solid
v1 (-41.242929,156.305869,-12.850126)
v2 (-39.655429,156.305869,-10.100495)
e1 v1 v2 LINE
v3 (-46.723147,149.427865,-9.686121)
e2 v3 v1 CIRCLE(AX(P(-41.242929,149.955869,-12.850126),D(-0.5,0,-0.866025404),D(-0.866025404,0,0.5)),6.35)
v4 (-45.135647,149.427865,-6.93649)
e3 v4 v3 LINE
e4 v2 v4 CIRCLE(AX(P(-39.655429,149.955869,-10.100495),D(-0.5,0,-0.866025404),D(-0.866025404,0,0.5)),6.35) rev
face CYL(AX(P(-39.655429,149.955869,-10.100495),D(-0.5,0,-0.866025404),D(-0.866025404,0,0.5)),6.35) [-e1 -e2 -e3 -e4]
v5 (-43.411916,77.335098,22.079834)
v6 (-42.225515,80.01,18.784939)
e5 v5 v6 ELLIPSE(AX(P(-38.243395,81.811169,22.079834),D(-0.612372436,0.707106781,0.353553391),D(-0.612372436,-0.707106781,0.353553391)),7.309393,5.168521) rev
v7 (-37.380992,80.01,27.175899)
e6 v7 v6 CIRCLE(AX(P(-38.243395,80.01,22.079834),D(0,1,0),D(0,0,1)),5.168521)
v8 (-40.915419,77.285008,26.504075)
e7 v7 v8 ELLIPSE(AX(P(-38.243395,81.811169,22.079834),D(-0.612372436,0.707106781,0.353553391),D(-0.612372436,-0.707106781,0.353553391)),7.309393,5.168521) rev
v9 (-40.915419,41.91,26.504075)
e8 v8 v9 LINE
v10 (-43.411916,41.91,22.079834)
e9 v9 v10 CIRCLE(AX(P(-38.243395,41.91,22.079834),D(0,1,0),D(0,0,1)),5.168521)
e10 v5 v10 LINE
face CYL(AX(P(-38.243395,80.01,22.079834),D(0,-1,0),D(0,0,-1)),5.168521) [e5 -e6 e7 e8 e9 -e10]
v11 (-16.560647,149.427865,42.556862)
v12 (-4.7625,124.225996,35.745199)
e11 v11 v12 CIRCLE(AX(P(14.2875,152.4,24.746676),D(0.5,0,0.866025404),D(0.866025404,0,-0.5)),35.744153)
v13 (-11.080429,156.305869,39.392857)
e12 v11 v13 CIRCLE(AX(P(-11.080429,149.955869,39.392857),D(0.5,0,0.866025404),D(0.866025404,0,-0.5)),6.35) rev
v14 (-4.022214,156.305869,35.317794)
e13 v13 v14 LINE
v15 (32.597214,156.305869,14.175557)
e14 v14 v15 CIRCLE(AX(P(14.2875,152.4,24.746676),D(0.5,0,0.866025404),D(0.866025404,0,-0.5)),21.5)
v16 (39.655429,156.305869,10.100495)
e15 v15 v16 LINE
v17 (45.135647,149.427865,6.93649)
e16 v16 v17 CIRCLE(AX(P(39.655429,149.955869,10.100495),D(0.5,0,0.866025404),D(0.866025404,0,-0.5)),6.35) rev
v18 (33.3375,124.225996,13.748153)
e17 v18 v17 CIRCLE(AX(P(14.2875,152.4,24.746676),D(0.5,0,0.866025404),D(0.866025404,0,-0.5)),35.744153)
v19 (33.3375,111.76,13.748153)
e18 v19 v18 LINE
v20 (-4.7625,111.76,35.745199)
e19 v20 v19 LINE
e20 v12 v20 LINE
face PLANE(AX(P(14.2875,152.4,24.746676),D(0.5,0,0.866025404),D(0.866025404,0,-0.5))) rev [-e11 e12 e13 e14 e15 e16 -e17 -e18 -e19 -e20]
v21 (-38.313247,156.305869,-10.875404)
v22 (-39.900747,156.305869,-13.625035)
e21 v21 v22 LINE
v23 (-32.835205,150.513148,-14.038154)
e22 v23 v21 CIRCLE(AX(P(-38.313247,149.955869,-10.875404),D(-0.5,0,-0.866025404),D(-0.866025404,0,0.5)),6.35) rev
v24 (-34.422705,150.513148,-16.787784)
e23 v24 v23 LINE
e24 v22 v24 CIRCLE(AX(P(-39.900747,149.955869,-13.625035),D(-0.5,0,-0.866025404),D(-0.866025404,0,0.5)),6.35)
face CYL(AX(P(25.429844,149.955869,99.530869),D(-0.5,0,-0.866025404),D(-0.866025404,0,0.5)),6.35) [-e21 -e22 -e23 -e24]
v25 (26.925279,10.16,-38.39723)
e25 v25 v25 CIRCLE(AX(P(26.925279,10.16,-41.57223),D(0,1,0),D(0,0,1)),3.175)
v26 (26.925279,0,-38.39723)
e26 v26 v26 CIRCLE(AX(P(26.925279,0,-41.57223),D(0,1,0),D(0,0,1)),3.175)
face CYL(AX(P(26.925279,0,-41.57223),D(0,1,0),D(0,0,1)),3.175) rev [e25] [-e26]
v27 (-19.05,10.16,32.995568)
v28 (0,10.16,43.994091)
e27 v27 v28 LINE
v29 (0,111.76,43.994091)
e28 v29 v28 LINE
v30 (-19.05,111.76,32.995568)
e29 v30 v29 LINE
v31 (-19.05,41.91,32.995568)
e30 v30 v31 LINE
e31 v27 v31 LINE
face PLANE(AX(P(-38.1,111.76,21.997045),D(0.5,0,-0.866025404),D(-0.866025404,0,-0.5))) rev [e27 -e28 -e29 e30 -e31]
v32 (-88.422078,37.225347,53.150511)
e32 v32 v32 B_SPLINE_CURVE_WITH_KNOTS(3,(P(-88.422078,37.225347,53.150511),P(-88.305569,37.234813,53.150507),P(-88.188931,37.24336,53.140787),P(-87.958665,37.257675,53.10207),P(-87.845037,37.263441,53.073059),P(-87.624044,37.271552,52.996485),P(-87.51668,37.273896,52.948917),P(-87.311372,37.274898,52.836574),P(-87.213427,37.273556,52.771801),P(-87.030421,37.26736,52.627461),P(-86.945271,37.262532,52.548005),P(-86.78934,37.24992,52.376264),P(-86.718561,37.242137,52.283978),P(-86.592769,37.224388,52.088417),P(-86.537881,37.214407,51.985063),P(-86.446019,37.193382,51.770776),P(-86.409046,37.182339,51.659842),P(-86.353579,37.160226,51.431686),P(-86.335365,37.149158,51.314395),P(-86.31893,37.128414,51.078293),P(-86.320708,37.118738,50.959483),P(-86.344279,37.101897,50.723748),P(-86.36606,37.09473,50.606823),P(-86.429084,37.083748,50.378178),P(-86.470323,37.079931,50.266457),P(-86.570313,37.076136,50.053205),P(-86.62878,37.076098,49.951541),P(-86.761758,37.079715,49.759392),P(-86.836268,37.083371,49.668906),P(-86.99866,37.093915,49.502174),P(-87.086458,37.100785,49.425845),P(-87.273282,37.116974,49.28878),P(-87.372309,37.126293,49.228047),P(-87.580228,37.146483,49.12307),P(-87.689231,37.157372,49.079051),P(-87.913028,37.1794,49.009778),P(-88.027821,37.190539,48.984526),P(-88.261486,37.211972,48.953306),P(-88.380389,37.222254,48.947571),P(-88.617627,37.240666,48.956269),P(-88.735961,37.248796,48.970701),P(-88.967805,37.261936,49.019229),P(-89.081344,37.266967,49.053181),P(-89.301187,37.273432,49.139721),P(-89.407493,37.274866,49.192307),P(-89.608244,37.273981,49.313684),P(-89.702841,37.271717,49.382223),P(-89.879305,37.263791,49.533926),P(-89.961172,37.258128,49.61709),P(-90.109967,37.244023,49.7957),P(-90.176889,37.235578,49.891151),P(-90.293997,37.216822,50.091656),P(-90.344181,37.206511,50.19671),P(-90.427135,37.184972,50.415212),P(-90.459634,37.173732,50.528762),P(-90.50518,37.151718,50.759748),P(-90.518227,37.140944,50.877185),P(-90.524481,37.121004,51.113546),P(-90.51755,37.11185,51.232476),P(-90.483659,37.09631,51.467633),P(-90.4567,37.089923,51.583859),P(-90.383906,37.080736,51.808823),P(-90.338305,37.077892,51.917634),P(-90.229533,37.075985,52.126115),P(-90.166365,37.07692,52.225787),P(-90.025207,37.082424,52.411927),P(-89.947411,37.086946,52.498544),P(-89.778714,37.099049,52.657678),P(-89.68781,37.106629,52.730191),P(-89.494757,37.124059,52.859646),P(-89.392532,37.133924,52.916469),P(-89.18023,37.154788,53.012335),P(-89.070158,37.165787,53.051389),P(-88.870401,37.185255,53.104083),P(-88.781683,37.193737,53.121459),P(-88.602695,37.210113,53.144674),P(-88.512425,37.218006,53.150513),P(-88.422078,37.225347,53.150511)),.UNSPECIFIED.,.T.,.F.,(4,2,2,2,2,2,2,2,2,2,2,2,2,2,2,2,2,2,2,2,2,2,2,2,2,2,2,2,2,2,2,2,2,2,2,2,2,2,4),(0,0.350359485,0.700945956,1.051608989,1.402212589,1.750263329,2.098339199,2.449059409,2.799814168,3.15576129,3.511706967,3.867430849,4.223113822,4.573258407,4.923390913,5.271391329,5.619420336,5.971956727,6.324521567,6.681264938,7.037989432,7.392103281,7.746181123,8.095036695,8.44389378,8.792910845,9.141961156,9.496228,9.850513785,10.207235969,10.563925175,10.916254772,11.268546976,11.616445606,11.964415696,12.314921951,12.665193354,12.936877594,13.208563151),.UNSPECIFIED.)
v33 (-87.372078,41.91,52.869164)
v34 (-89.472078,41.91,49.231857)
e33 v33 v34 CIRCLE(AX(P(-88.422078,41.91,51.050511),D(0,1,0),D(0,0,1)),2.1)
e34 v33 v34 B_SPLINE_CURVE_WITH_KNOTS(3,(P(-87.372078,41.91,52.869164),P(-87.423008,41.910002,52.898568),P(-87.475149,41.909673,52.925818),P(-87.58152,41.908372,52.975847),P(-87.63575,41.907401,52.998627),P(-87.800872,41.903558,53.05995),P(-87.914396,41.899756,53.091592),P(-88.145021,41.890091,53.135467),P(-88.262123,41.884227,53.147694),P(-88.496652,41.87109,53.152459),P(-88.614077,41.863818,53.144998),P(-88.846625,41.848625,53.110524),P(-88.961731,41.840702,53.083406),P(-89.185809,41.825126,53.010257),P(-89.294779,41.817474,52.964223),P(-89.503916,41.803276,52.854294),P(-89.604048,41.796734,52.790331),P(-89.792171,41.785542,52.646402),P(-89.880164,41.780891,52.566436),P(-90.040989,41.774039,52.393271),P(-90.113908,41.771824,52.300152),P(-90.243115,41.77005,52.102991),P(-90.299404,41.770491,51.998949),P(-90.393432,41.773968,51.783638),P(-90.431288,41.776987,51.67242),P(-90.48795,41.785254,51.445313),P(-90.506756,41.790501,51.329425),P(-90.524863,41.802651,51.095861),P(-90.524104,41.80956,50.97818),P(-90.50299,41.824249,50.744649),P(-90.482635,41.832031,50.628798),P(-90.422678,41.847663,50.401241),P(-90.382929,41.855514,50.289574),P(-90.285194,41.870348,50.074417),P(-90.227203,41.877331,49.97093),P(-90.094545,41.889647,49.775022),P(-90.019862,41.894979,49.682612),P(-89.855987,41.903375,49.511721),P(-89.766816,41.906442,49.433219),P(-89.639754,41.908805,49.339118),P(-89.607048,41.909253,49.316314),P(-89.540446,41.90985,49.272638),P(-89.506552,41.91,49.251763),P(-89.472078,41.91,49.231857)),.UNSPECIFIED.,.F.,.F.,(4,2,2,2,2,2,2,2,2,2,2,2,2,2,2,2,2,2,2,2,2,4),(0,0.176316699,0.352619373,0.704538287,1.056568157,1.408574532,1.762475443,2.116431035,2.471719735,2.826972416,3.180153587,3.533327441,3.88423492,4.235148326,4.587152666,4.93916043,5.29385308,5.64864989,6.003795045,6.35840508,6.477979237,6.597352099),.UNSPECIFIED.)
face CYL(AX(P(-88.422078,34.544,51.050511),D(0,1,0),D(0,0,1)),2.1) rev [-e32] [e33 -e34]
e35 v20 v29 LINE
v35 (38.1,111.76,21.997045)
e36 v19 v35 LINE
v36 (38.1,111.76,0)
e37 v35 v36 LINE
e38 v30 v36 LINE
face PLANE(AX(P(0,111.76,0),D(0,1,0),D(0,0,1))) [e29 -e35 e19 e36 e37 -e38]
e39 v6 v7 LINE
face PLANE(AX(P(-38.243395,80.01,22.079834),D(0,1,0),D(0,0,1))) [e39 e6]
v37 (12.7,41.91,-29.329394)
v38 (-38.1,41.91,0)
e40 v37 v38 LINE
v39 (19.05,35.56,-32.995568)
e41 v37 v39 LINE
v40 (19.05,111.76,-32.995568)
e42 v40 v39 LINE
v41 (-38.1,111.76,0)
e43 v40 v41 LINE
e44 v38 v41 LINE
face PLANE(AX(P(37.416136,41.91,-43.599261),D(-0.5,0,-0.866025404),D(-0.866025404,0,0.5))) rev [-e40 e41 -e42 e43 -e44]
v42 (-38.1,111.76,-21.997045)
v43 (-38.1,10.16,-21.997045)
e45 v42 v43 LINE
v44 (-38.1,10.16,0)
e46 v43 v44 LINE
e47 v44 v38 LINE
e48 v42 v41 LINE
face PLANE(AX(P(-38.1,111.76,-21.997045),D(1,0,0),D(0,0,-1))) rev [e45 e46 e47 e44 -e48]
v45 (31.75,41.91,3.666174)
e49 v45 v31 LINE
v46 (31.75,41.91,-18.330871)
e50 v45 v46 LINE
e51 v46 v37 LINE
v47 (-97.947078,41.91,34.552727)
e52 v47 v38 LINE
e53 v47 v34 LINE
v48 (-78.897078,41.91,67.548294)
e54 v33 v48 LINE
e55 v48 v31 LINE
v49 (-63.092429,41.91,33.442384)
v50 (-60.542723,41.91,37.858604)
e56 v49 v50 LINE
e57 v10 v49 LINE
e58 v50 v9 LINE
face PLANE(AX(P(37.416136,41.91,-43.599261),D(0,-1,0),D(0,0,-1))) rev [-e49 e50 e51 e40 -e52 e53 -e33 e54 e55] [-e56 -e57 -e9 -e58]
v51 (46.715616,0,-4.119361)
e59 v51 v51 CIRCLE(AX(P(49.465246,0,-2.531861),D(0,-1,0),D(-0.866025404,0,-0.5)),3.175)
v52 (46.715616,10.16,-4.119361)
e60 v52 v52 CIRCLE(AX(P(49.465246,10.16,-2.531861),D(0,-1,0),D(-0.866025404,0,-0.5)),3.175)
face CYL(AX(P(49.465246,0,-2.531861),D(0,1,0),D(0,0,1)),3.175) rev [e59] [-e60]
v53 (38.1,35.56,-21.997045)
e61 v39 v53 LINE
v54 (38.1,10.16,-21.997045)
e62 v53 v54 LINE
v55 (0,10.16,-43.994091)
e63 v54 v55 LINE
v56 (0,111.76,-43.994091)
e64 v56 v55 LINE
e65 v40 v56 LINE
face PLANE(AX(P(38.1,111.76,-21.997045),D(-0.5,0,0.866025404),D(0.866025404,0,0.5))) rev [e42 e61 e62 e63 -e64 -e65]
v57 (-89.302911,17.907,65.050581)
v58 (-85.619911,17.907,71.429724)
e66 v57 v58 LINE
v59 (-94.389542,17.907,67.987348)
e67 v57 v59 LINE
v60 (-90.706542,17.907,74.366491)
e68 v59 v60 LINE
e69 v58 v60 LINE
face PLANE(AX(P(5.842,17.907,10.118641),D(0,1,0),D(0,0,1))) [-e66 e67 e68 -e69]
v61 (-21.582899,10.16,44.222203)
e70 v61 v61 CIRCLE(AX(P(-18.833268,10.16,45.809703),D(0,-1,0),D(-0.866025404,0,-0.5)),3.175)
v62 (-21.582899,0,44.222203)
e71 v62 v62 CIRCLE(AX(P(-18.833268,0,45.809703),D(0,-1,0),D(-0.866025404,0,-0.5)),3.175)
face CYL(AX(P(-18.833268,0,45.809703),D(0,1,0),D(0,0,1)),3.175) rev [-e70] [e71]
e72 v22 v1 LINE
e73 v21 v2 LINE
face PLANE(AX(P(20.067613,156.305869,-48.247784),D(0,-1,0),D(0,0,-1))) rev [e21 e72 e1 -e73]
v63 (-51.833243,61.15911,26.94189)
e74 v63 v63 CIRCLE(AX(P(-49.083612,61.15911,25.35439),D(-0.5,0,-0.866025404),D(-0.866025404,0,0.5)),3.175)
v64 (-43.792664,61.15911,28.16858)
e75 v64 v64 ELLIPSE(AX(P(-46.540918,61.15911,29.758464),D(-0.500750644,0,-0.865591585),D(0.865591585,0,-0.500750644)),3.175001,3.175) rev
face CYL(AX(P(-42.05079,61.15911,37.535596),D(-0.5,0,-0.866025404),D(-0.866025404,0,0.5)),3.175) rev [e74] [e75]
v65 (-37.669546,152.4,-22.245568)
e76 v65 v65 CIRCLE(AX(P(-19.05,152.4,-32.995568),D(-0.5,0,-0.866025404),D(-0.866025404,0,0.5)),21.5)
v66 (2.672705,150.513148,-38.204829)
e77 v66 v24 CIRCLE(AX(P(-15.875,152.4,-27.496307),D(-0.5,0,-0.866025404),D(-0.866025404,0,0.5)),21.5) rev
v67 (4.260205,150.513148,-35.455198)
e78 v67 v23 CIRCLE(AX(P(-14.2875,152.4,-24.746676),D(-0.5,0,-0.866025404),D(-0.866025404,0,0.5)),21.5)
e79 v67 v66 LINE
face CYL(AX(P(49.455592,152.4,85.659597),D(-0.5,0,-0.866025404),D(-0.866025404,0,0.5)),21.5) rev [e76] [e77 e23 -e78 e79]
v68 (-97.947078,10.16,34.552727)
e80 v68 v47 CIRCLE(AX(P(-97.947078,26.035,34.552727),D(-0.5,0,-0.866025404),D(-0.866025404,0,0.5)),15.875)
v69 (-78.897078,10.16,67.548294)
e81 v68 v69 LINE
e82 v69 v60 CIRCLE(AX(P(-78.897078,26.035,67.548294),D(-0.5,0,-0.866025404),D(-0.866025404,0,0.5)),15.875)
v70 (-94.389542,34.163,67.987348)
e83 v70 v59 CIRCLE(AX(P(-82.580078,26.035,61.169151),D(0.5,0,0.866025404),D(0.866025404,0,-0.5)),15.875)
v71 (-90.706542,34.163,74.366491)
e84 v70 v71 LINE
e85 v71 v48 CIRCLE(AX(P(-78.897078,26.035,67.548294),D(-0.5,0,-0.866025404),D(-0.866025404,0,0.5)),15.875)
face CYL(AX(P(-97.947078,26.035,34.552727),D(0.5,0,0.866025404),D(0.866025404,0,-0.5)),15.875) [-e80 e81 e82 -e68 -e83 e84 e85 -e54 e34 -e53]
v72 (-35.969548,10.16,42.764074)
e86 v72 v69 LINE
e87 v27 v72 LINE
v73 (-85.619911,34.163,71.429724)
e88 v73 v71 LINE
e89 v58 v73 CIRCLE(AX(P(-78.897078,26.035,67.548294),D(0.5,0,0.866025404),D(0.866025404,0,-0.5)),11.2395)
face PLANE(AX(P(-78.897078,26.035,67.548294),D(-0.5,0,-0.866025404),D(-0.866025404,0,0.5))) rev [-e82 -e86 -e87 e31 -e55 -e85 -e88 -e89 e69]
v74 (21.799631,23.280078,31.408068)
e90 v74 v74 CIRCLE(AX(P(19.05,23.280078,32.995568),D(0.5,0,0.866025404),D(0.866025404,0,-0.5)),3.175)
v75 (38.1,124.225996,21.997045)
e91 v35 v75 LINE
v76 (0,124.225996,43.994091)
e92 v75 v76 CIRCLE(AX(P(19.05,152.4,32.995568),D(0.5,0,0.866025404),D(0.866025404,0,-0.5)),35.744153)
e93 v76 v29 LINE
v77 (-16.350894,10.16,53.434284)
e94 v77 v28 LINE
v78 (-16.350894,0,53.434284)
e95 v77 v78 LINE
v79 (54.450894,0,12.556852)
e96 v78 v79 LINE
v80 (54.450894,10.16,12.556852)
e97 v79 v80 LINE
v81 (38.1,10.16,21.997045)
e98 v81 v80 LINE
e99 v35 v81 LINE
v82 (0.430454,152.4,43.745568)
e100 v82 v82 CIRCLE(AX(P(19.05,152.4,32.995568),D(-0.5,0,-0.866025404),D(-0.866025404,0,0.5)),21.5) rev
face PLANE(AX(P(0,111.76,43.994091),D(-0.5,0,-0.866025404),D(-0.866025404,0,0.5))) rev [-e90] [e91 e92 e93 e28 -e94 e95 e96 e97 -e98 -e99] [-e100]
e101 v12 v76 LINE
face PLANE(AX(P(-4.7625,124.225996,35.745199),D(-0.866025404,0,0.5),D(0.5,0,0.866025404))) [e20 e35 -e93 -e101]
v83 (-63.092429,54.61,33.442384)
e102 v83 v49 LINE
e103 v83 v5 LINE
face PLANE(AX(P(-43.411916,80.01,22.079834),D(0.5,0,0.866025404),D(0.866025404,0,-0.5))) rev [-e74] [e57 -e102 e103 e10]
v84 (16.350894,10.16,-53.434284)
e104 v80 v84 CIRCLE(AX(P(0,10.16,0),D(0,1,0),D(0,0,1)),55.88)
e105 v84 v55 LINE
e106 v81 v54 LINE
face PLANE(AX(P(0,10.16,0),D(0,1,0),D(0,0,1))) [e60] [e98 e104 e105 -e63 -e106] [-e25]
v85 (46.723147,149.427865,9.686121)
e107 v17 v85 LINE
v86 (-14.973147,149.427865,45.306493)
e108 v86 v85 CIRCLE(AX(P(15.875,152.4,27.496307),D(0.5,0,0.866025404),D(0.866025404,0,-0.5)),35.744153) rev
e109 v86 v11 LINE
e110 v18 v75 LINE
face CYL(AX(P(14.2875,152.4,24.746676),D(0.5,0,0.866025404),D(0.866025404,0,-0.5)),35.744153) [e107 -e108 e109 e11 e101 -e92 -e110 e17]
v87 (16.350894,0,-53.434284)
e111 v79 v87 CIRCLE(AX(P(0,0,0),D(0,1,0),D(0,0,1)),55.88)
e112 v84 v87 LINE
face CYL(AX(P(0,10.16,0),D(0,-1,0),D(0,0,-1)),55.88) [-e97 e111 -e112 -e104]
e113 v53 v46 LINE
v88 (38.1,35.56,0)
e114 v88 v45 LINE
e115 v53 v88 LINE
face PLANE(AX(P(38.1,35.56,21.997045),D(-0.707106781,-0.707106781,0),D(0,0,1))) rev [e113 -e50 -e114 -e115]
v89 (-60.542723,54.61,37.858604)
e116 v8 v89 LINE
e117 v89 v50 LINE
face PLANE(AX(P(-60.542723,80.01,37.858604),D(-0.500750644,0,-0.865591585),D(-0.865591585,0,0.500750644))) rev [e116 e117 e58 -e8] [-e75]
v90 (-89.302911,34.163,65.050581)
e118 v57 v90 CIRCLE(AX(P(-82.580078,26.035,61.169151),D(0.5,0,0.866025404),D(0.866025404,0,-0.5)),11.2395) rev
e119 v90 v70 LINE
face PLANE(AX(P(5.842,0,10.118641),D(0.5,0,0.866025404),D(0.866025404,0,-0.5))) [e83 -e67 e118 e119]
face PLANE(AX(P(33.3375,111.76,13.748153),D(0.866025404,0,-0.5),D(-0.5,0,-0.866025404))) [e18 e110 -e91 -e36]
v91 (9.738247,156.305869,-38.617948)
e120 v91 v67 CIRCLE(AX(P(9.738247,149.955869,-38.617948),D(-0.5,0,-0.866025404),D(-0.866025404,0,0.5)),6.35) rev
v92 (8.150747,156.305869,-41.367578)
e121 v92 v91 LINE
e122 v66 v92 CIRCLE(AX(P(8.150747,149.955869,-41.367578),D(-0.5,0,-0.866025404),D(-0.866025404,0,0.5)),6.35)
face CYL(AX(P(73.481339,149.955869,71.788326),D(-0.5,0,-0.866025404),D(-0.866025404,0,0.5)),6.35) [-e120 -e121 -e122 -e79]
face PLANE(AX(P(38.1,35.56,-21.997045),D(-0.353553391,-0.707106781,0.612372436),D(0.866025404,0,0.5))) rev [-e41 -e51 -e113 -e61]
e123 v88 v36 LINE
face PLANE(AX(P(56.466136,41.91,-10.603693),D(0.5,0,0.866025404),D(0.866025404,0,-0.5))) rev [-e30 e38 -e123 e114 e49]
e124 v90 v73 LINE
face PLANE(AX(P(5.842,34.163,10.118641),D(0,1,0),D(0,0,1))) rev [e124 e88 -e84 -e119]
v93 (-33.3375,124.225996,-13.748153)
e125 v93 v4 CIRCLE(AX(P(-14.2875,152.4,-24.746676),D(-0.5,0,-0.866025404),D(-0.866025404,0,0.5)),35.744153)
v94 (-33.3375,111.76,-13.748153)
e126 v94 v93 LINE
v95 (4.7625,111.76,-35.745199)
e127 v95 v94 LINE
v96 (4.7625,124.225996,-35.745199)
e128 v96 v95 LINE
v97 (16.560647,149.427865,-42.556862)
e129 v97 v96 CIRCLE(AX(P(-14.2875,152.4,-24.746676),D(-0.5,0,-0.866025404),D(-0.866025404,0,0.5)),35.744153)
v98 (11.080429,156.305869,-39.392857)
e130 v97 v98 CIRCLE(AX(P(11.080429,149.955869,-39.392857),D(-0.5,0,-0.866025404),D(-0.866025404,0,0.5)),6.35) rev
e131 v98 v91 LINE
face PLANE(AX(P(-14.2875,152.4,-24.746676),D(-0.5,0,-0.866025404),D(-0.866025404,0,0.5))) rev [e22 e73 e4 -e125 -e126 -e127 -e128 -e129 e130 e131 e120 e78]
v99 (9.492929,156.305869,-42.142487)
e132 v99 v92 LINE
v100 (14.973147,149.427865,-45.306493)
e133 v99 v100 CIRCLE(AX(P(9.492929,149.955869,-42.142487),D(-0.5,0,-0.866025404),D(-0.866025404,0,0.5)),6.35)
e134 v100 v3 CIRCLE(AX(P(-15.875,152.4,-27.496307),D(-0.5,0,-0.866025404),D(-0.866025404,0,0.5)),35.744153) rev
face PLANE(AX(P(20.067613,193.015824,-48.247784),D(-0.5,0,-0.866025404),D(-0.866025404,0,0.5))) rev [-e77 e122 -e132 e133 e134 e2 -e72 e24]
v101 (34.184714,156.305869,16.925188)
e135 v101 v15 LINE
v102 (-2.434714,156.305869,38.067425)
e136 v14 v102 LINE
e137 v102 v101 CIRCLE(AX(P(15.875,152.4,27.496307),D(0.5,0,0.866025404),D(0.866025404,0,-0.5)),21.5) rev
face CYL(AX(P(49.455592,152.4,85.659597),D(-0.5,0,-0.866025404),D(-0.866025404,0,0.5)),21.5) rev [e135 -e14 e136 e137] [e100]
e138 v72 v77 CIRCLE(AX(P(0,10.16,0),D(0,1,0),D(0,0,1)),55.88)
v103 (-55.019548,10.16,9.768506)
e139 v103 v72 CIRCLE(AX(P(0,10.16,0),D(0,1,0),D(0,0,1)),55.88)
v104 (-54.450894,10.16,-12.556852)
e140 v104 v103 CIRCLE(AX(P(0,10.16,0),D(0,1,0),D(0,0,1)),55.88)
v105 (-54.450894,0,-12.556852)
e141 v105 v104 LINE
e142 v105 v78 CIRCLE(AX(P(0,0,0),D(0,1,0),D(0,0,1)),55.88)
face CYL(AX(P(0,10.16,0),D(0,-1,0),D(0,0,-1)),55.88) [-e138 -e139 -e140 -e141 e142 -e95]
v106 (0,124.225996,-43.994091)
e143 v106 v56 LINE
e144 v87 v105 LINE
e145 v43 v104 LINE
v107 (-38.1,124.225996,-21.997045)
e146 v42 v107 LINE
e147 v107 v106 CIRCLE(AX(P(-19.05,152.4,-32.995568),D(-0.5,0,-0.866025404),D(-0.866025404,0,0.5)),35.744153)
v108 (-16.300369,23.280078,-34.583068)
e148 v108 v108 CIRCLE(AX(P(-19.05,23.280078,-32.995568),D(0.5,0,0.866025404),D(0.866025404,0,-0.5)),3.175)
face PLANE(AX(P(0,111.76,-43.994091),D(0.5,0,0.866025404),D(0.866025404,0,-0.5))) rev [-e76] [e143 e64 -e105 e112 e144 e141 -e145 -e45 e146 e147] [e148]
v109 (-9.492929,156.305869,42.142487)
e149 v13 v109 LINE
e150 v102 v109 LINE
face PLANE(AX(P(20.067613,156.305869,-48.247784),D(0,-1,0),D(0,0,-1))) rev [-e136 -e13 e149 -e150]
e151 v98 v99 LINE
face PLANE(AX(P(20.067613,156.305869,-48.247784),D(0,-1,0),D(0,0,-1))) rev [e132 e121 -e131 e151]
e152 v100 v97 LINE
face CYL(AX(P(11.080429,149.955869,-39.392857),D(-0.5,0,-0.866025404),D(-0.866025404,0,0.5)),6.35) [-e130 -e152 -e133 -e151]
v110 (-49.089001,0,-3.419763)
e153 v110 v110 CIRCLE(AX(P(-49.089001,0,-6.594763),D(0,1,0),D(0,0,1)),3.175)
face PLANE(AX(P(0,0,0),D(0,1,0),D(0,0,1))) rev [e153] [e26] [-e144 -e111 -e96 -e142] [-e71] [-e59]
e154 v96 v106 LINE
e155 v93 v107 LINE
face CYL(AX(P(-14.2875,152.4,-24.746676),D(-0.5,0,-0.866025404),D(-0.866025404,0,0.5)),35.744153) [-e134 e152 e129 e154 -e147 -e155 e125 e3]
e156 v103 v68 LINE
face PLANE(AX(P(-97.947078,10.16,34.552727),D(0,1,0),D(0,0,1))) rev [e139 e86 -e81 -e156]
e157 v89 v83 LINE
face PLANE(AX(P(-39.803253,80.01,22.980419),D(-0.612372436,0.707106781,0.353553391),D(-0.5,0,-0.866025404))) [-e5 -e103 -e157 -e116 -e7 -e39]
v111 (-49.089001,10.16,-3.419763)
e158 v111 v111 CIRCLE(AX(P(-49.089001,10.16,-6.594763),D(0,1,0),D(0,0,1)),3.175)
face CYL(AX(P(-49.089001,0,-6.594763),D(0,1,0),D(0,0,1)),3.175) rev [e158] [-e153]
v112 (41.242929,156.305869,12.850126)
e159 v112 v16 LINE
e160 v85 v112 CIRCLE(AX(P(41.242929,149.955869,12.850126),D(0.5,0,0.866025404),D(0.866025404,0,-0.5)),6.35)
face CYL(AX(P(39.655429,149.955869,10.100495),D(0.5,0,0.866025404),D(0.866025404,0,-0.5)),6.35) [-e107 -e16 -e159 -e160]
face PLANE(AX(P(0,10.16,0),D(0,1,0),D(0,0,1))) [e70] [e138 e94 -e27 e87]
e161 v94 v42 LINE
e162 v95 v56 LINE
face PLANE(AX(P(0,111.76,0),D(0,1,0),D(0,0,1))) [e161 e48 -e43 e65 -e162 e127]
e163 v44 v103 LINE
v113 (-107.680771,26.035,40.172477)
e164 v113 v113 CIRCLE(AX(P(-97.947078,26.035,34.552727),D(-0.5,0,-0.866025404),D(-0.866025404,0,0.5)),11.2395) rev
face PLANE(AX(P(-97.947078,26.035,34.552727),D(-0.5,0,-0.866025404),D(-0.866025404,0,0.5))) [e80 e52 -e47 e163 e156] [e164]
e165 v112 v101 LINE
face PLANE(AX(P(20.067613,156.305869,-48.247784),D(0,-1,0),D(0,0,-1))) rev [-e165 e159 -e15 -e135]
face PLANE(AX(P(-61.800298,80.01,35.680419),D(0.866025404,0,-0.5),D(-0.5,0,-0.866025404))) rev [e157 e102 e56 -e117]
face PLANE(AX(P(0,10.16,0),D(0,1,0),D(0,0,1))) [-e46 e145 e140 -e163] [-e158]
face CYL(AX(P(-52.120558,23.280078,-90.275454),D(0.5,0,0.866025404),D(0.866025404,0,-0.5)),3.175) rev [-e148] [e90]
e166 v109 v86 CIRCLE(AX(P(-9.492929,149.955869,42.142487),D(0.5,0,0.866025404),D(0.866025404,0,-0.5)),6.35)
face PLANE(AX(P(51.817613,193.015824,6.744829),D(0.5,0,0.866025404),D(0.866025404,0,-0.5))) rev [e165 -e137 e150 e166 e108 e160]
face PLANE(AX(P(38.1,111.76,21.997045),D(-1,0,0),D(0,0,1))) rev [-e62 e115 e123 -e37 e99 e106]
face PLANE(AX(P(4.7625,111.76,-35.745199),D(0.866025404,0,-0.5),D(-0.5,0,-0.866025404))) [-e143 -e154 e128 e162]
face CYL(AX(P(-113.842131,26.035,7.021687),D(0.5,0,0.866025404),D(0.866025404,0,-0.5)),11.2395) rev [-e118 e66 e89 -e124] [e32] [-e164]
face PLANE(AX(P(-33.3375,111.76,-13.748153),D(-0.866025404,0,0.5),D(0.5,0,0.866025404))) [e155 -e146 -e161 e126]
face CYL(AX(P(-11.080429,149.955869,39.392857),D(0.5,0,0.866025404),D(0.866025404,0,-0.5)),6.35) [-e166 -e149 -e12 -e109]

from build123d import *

# Parameters (mm, degrees)
SKETCH4_R            = 55.88
BOSS_EXTRUDE2_DEPTH  = 10.16
BOSS_EXTRUDE4_DEPTH  = 101.6
BOSS_EXTRUDE5_DEPTH  = 9.525
BOSS_EXTRUDE6_START  = -9.525
BOSS_EXTRUDE6_DEPTH  = 9.525
CUT_EXTRUDE4_REACH   = 223.16
SKETCH12_R           = 21.5
SKETCH13_W           = 38.1
SKETCH13_H           = 69.85
CUT_EXTRUDE5_DEPTH   = 76.2
BOSS_EXTRUDE10_DEPTH = 19.05
SKETCH28_R           = 11.2395
CUT_EXTRUDE9_DEPTH   = 38.1
CUT_EXTRUDE10_DEPTH  = 7.366
CHAMFER1_SIZE        = 6.35
SKETCH30_R           = 2.1
CUT_EXTRUDE11_DEPTH  = 7.366
SKETCH31_R           = 3.175
CUT_EXTRUDE12_DEPTH  = 223.900333216
BOSS_EXTRUDE11_DEPTH = 38.1
CHAMFER2_SIZE        = 25.4
CUT_EXTRUDE13_REACH  = 233.204
SKETCH34_R           = 3.175
SKETCH35_R           = 3.175
CUT_EXTRUDE14_DEPTH  = 246.746626534
SKETCH36_W           = 63.5
SKETCH36_H           = 36.709955102
CUT_EXTRUDE15_DEPTH  = 63.5
FILLET1_R            = 6.35
CUT_EXTRUDE16_DEPTH  = 223.900333216


with BuildPart() as part:
    # Sketch4 → Boss-Extrude2 (new body)
    with BuildSketch(Plane(origin=(0, 0, 0), x_dir=(1, 0, 0), z_dir=(0, 1, 0))):
        with Locations(Location((0, 0, 0), (0, 0, 270))):
            Circle(SKETCH4_R)
    extrude(amount=BOSS_EXTRUDE2_DEPTH)

    # Sketch8 → Boss-Extrude4 (add)
    with BuildSketch(Plane(origin=(0, 10.16, 0), x_dir=(1, 0, 0), z_dir=(0, 1, 0))):
        Polygon((0, 43.994090512), (-38.1, 21.997045256), (-38.1, -21.997045256), (0, -43.994090512), (38.1, -21.997045256), (38.1, 21.997045256), align=None)
    extrude(amount=BOSS_EXTRUDE4_DEPTH)

    # Sketch9 → Boss-Extrude5 (add)
    with BuildSketch(Plane(origin=(-19.05, 0, -32.995567884), x_dir=(-0.8660254037844386, 0, 0.5000000000000003), z_dir=(-0.5000000000000002, 0, -0.8660254037844385))):
        with BuildLine():
            Line((21.997045256, 111.76), (-21.997045256, 111.76))
            Line((-21.997045256, 111.76), (-21.997045256, 124.225996336))
            ThreePointArc((-21.997045256, 124.225996336), (0, 188.144153123), (21.997045256, 124.225996336))
            Line((21.997045256, 124.225996336), (21.997045256, 111.76))
        make_face()
    extrude(amount=-BOSS_EXTRUDE5_DEPTH)

    # Sketch10 → Boss-Extrude6 (add)
    with BuildSketch(Plane(origin=(19.05, 0, 32.995567884), x_dir=(0.8660254037844386, 0, -0.5000000000000001), z_dir=(0.5000000000000001, 0, 0.8660254037844386)).offset(BOSS_EXTRUDE6_START)):
        with BuildLine():
            Line((-21.997045256, 111.76), (21.997045256, 111.76))
            Line((21.997045256, 111.76), (21.997045256, 124.225996336))
            ThreePointArc((21.997045256, 124.225996336), (0, 188.144153123), (-21.997045256, 124.225996336))
            Line((-21.997045256, 124.225996336), (-21.997045256, 111.76))
        make_face()
    extrude(amount=BOSS_EXTRUDE6_DEPTH)

    # Cut-Extrude4: up to this face of the body (flat: up to its plane)
    cut_extrude4_end = Plane(part.part.faces().sort_by_distance((19.05, 104.643172711, 32.995567884))[0])
    # Sketch12 → Cut-Extrude4 (cut, up to the picked face)
    with BuildSketch(Plane(origin=(-19.05, 0, -32.995567884), x_dir=(-0.8660254037844386, 0, 0.5000000000000003), z_dir=(-0.5000000000000002, 0, -0.8660254037844385)), mode=Mode.PRIVATE) as cut_extrude4_sk1:
        with Locations((0, 152.4)):
            Circle(SKETCH12_R)
    cut_extrude4_tool1 = split(extrude(cut_extrude4_sk1.sketch, amount=-CUT_EXTRUDE4_REACH, mode=Mode.PRIVATE), bisect_by=cut_extrude4_end, keep=Keep.BOTH, mode=Mode.PRIVATE)
    add(cut_extrude4_tool1.solids().sort_by(Axis((-19.05, 152.4, -32.995568), (0.5000000000000002, 0, 0.8660254037844385)))[0], mode=Mode.SUBTRACT)

    # Sketch13 → Cut-Extrude5 (cut, symmetric)
    with BuildSketch(Plane(origin=(-19.05, 0, 10.998522628), x_dir=(0.5000000000000002, 0, 0.8660254037844386), z_dir=(-0.8660254037844385, 0, 0.5000000000000001))):
        with Locations((0, 76.835)):
            Rectangle(SKETCH13_W, SKETCH13_H)
    extrude(amount=CUT_EXTRUDE5_DEPTH, both=True, mode=Mode.SUBTRACT)

    # Sketch22 → Boss-Extrude10 (add, symmetric)
    with BuildSketch(Plane(origin=(0, 0, 0), x_dir=(-0.8660254037844386, 0, 0.5000000000000001), z_dir=(-0.5000000000000001, 0, -0.8660254037844386))):
        with BuildLine():
            Line((43.994090512, 41.91), (102.10102108, 41.91))
            ThreePointArc((102.10102108, 41.91), (117.97602108, 26.035), (102.10102108, 10.16))
            Line((102.10102108, 10.16), (43.994090512, 10.16))
            Line((43.994090512, 10.16), (21.997045256, 10.16))
            Line((21.997045256, 10.16), (21.997045256, 41.91))
            Line((21.997045256, 41.91), (43.994090512, 41.91))
        make_face()
    extrude(amount=BOSS_EXTRUDE10_DEPTH, both=True)

    # Sketch28 → Cut-Extrude9 (cut)
    with BuildSketch(Plane(origin=(9.525, 0, 16.497783942), x_dir=(0.8660254037844386, 0, -0.5000000000000001), z_dir=(0.5000000000000001, 0, 0.8660254037844386))):
        with Locations((-102.10102108, 26.035)):
            Circle(SKETCH28_R)
    extrude(amount=-CUT_EXTRUDE9_DEPTH, mode=Mode.SUBTRACT)

    # Sketch29 → Cut-Extrude10 (cut)
    with BuildSketch(Plane(origin=(9.525, 0, 16.497783942), x_dir=(0.8660254037844386, 0, -0.5000000000000001), z_dir=(0.5000000000000001, 0, 0.8660254037844386))):
        with BuildLine():
            Line((-115.737415068, 17.907), (-109.863879848, 17.907))
            ThreePointArc((-109.863879848, 17.907), (-113.34052108, 26.035), (-109.863879848, 34.163))
            Line((-109.863879848, 34.163), (-115.737415068, 34.163))
            ThreePointArc((-115.737415068, 34.163), (-117.97602108, 26.035), (-115.737415068, 17.907))
        make_face()
    extrude(amount=-CUT_EXTRUDE10_DEPTH, mode=Mode.SUBTRACT)

    # Chamfer1
    chamfer1_edges = [part.edges().sort_by_distance(p)[0] for p in [
        (38.1, 41.91, -10.998522628),
        (28.575, 41.91, -27.49630657),
    ]]
    chamfer(chamfer1_edges, length=CHAMFER1_SIZE)

    # Sketch30 → Cut-Extrude11 (cut)
    with BuildSketch(Plane(origin=(0, 41.91, 0), x_dir=(1, 0, 0), z_dir=(0, 1, 0))):
        with Locations(Location((-88.422078008, -51.05051054, 0), (0, 0, 270))):
            Circle(SKETCH30_R)
    extrude(amount=-CUT_EXTRUDE11_DEPTH, mode=Mode.SUBTRACT)

    # Sketch31 → Cut-Extrude12 (cut, through all)
    with BuildSketch(Plane(origin=(0, 10.16, 0), x_dir=(1, 0, 0), z_dir=(0, 1, 0))):
        with Locations(Location((-49.089000823, 6.594762938, 0), (0, 0, 270))):
            Circle(SKETCH31_R)
        with Locations(Location((26.925278647, 41.57222955, 0), (0, 0, 270))):
            Circle(SKETCH31_R)
    cut_extrude12 = extrude(amount=-CUT_EXTRUDE12_DEPTH, mode=Mode.SUBTRACT)

    # Mirror1: Cut-Extrude12 across plane
    add(cut_extrude12.mirror(Plane(origin=(0, 0, 0), x_dir=(-0.8660254037844386, 0, 0.5000000000000001), z_dir=(-0.5000000000000001, 0, -0.8660254037844386))), mode=Mode.SUBTRACT)

    # Sketch33 → Boss-Extrude11 (add)
    with BuildSketch(Plane(origin=(0, 41.91, 0), x_dir=(1, 0, 0), z_dir=(0, 1, 0))):
        with BuildLine():
            Line((-43.411916389, -22.079834386), (-63.092428819, -33.442383535))
            Line((-63.092428819, -33.442383535), (-61.800298466, -35.680418955))
            Line((-61.800298466, -35.680418955), (-60.542722832, -37.858603849))
            Line((-60.542722832, -37.858603849), (-40.91541904, -26.504074545))
            ThreePointArc((-40.91541904, -26.504074545), (-33.742060338, -19.539834386), (-43.411916389, -22.079834386))
        make_face()
    extrude(amount=BOSS_EXTRUDE11_DEPTH)

    # Chamfer2
    chamfer2_edges = [part.edges().sort_by_distance(p)[0] for p in [
        (-61.817575825, 80.01, 35.650493692),
    ]]
    chamfer(chamfer2_edges, length=CHAMFER2_SIZE)

    # Cut-Extrude13: up to this plane
    cut_extrude13_end = Plane(origin=(-60.542722832, 80.01, 37.858603849), z_dir=(-0.500750644235671, 0, -0.8655915851587056))
    # Sketch34 → Cut-Extrude13 (cut, up to the surface)
    with BuildSketch(Plane(origin=(-1.292130352, 0, -2.23803542), x_dir=(-0.8660254037844386, 0, 0.5000000000000003), z_dir=(-0.5000000000000002, 0, -0.8660254037844385)), mode=Mode.PRIVATE) as cut_extrude13_sk1:
        with Locations((55.184849848, 61.159110234)):
            Circle(SKETCH34_R)
    cut_extrude13_tool1 = split(extrude(cut_extrude13_sk1.sketch, amount=-CUT_EXTRUDE13_REACH, mode=Mode.PRIVATE), bisect_by=cut_extrude13_end, keep=Keep.BOTH, mode=Mode.PRIVATE)
    add(cut_extrude13_tool1.solids().sort_by_distance((-49.083612, 61.15911, 25.35439))[0], mode=Mode.SUBTRACT)

    # Sketch35 → Cut-Extrude14 (cut, through all)
    with BuildSketch(Plane(origin=(19.05, 0, 32.995567884), x_dir=(0.8660254037844386, 0, -0.5000000000000001), z_dir=(0.5000000000000001, 0, 0.8660254037844386))):
        with Locations((0, 23.280078313)):
            Circle(SKETCH35_R)
    extrude(amount=-CUT_EXTRUDE14_DEPTH, mode=Mode.SUBTRACT)

    # Sketch36 → Cut-Extrude15 (cut, symmetric)
    with BuildSketch(Plane(origin=(-19.05, 0, 10.998522628), x_dir=(0.5000000000000004, 0, 0.8660254037844384), z_dir=(-0.8660254037844384, 0, 0.5000000000000004))):
        with Locations((0, 174.660846527)):
            Rectangle(SKETCH36_W, SKETCH36_H)
    extrude(amount=CUT_EXTRUDE15_DEPTH, both=True, mode=Mode.SUBTRACT)

    # Fillet1
    # the kernel refuses this fillet: 6.35 mm, written as the material it takes off along each edge
    with BuildSketch(Plane(origin=(12.272597523, 156.305868976, -21.027711652), x_dir=(0.04103819462533737, -0.9988766133891899, -0.023693412713994805), z_dir=(-0.5000000000000003, 0, -0.8660254037844386))) as fillet1_piece_1:
        with BuildLine():
            CenterArc((6.655634068, -6.291985478), FILLET1_R, 97.750867839, 84.965214409)
            Line((0.312767573, -6.592891819), (0, 0))
            ThreePointArc((0, 0), (2.899617679, -0.196427123), (5.799235358, 0))
        make_face()
    extrude(amount=19.675766287, mode=Mode.SUBTRACT)
    with BuildSketch(Plane(origin=(-24.346831236, 156.305868976, 0.114525399), x_dir=(-0.04103819462533767, -0.9988766133891899, 0.023693412713994975), z_dir=(-0.5000000000000003, 0, -0.8660254037844386))) as fillet1_piece_2:
        with BuildLine():
            CenterArc((6.655634068, 6.291985478), FILLET1_R, 177.283917752, 84.965214409)
            Line((0.312767573, 6.592891819), (0, 0))
            ThreePointArc((0, 0), (2.899617679, 0.196427123), (5.799235358, 0))
        make_face()
    extrude(amount=19.675766287, mode=Mode.SUBTRACT)
    with BuildSketch(Plane(origin=(-14.894977291, 156.305868976, 45.261361242), x_dir=(-0.011364190914464473, -0.999913899736612, 0.0065611186835884), z_dir=(-0.5000000000000002, 0, -0.8660254037844386)), Plane(origin=(-36.459231913, 156.305868976, 7.91097661), x_dir=(-0.011364190914463116, -0.999913899736612, 0.0065611186835876165), z_dir=(-0.5000000000000002, 0, -0.8660254037844386))) as fillet1_piece_3:
        with BuildLine():
            CenterArc((6.26760006, -6.320536654), FILLET1_R, 84.478464497, 94.769665105)
            Line((-0.081853204, -6.237210446), (0, 0))
            ThreePointArc((0, 0), (3.439298151, 0.165849191), (6.878596303, 0))
        make_face()
    extrude(amount=20.371490756, mode=Mode.SUBTRACT)
    with BuildSketch(Plane(origin=(25.080722669, 156.305868976, -27.619132734), x_dir=(0.011364190914465366, -0.999913899736612, -0.00656111868358885), z_dir=(-0.5000000000000002, 0, -0.8660254037844386)), Plane(origin=(46.644977291, 156.305868976, 9.731251898), x_dir=(0.011364190914466365, -0.999913899736612, -0.006561118683589426), z_dir=(-0.5000000000000002, 0, -0.8660254037844386))) as fillet1_piece_4:
        with BuildLine():
            CenterArc((6.26760006, 6.320536654), FILLET1_R, 180.751870398, 94.769665105)
            Line((-0.081853204, 6.237210446), (0, 0))
            ThreePointArc((0, 0), (3.439298151, -0.165849191), (6.878596303, 0))
        make_face()
    extrude(amount=20.371490756, mode=Mode.SUBTRACT)

    # Sketch37 → Cut-Extrude16 (cut, through all)
    with BuildSketch(Plane(origin=(0, 10.16, 0), x_dir=(1, 0, 0), z_dir=(0, 1, 0))):
        with BuildLine():
            Line((-72.24200472, 2.28514964), (-54.450894057, 12.556852171))
            ThreePointArc((-54.450894057, 12.556852171), (-27.94, 48.393499563), (16.350894057, 53.434283597))
            Line((16.350894057, 53.434283597), (28.91906675, 60.690521485))
            Line((28.91906675, 60.690521485), (-19.05, 57.412021454))
            Line((-19.05, 57.412021454), (-73.371024583, 21.597251022))
            Line((-73.371024583, 21.597251022), (-72.24200472, 5.078102435))
            Line((-72.24200472, 5.078102435), (-72.24200472, 2.28514964))
        make_face()
        with BuildLine():
            Line((-54.450894057, 12.556852171), (-50.005344641, 15.123491323))
            Line((-50.005344641, 15.123491323), (-38.792463926, 21.597251022))
            Line((-38.792463926, 21.597251022), (-38.1, 21.997045256))
            Line((-38.1, 21.997045256), (0, 43.994090512))
            Line((0, 43.994090512), (11.905344641, 50.867644445))
            Line((11.905344641, 50.867644445), (16.350894057, 53.434283597))
            ThreePointArc((16.350894057, 53.434283597), (-27.94, 48.393499563), (-54.450894057, 12.556852171))
        make_face()
        with BuildLine():
            ThreePointArc((-16.350894057, -53.434283597), (27.94, -48.393499563), (54.450894057, -12.556852171))
            Line((54.450894057, -12.556852171), (38.1, -21.997045256))
            Line((38.1, -21.997045256), (19.05, -32.995567884))
            Line((19.05, -32.995567884), (0, -43.994090512))
            Line((0, -43.994090512), (-16.350894057, -53.434283597))
        make_face()
        with BuildLine():
            Line((63.673498956, -7.232178749), (54.450894057, -12.556852171))
            ThreePointArc((54.450894057, -12.556852171), (27.94, -48.393499563), (-16.350894057, -53.434283597))
            Line((-16.350894057, -53.434283597), (-27.007271943, -59.586746239))
            Line((-27.007271943, -59.586746239), (28.91906675, -77.707339719))
            Line((28.91906675, -77.707339719), (77.1233643, -25.432245504))
            Line((77.1233643, -25.432245504), (71.516001253, -6.077798857))
            Line((71.516001253, -6.077798857), (63.673498956, -7.232178749))
        make_face()
    extrude(amount=-CUT_EXTRUDE16_DEPTH, mode=Mode.SUBTRACT)


solid = part.part
